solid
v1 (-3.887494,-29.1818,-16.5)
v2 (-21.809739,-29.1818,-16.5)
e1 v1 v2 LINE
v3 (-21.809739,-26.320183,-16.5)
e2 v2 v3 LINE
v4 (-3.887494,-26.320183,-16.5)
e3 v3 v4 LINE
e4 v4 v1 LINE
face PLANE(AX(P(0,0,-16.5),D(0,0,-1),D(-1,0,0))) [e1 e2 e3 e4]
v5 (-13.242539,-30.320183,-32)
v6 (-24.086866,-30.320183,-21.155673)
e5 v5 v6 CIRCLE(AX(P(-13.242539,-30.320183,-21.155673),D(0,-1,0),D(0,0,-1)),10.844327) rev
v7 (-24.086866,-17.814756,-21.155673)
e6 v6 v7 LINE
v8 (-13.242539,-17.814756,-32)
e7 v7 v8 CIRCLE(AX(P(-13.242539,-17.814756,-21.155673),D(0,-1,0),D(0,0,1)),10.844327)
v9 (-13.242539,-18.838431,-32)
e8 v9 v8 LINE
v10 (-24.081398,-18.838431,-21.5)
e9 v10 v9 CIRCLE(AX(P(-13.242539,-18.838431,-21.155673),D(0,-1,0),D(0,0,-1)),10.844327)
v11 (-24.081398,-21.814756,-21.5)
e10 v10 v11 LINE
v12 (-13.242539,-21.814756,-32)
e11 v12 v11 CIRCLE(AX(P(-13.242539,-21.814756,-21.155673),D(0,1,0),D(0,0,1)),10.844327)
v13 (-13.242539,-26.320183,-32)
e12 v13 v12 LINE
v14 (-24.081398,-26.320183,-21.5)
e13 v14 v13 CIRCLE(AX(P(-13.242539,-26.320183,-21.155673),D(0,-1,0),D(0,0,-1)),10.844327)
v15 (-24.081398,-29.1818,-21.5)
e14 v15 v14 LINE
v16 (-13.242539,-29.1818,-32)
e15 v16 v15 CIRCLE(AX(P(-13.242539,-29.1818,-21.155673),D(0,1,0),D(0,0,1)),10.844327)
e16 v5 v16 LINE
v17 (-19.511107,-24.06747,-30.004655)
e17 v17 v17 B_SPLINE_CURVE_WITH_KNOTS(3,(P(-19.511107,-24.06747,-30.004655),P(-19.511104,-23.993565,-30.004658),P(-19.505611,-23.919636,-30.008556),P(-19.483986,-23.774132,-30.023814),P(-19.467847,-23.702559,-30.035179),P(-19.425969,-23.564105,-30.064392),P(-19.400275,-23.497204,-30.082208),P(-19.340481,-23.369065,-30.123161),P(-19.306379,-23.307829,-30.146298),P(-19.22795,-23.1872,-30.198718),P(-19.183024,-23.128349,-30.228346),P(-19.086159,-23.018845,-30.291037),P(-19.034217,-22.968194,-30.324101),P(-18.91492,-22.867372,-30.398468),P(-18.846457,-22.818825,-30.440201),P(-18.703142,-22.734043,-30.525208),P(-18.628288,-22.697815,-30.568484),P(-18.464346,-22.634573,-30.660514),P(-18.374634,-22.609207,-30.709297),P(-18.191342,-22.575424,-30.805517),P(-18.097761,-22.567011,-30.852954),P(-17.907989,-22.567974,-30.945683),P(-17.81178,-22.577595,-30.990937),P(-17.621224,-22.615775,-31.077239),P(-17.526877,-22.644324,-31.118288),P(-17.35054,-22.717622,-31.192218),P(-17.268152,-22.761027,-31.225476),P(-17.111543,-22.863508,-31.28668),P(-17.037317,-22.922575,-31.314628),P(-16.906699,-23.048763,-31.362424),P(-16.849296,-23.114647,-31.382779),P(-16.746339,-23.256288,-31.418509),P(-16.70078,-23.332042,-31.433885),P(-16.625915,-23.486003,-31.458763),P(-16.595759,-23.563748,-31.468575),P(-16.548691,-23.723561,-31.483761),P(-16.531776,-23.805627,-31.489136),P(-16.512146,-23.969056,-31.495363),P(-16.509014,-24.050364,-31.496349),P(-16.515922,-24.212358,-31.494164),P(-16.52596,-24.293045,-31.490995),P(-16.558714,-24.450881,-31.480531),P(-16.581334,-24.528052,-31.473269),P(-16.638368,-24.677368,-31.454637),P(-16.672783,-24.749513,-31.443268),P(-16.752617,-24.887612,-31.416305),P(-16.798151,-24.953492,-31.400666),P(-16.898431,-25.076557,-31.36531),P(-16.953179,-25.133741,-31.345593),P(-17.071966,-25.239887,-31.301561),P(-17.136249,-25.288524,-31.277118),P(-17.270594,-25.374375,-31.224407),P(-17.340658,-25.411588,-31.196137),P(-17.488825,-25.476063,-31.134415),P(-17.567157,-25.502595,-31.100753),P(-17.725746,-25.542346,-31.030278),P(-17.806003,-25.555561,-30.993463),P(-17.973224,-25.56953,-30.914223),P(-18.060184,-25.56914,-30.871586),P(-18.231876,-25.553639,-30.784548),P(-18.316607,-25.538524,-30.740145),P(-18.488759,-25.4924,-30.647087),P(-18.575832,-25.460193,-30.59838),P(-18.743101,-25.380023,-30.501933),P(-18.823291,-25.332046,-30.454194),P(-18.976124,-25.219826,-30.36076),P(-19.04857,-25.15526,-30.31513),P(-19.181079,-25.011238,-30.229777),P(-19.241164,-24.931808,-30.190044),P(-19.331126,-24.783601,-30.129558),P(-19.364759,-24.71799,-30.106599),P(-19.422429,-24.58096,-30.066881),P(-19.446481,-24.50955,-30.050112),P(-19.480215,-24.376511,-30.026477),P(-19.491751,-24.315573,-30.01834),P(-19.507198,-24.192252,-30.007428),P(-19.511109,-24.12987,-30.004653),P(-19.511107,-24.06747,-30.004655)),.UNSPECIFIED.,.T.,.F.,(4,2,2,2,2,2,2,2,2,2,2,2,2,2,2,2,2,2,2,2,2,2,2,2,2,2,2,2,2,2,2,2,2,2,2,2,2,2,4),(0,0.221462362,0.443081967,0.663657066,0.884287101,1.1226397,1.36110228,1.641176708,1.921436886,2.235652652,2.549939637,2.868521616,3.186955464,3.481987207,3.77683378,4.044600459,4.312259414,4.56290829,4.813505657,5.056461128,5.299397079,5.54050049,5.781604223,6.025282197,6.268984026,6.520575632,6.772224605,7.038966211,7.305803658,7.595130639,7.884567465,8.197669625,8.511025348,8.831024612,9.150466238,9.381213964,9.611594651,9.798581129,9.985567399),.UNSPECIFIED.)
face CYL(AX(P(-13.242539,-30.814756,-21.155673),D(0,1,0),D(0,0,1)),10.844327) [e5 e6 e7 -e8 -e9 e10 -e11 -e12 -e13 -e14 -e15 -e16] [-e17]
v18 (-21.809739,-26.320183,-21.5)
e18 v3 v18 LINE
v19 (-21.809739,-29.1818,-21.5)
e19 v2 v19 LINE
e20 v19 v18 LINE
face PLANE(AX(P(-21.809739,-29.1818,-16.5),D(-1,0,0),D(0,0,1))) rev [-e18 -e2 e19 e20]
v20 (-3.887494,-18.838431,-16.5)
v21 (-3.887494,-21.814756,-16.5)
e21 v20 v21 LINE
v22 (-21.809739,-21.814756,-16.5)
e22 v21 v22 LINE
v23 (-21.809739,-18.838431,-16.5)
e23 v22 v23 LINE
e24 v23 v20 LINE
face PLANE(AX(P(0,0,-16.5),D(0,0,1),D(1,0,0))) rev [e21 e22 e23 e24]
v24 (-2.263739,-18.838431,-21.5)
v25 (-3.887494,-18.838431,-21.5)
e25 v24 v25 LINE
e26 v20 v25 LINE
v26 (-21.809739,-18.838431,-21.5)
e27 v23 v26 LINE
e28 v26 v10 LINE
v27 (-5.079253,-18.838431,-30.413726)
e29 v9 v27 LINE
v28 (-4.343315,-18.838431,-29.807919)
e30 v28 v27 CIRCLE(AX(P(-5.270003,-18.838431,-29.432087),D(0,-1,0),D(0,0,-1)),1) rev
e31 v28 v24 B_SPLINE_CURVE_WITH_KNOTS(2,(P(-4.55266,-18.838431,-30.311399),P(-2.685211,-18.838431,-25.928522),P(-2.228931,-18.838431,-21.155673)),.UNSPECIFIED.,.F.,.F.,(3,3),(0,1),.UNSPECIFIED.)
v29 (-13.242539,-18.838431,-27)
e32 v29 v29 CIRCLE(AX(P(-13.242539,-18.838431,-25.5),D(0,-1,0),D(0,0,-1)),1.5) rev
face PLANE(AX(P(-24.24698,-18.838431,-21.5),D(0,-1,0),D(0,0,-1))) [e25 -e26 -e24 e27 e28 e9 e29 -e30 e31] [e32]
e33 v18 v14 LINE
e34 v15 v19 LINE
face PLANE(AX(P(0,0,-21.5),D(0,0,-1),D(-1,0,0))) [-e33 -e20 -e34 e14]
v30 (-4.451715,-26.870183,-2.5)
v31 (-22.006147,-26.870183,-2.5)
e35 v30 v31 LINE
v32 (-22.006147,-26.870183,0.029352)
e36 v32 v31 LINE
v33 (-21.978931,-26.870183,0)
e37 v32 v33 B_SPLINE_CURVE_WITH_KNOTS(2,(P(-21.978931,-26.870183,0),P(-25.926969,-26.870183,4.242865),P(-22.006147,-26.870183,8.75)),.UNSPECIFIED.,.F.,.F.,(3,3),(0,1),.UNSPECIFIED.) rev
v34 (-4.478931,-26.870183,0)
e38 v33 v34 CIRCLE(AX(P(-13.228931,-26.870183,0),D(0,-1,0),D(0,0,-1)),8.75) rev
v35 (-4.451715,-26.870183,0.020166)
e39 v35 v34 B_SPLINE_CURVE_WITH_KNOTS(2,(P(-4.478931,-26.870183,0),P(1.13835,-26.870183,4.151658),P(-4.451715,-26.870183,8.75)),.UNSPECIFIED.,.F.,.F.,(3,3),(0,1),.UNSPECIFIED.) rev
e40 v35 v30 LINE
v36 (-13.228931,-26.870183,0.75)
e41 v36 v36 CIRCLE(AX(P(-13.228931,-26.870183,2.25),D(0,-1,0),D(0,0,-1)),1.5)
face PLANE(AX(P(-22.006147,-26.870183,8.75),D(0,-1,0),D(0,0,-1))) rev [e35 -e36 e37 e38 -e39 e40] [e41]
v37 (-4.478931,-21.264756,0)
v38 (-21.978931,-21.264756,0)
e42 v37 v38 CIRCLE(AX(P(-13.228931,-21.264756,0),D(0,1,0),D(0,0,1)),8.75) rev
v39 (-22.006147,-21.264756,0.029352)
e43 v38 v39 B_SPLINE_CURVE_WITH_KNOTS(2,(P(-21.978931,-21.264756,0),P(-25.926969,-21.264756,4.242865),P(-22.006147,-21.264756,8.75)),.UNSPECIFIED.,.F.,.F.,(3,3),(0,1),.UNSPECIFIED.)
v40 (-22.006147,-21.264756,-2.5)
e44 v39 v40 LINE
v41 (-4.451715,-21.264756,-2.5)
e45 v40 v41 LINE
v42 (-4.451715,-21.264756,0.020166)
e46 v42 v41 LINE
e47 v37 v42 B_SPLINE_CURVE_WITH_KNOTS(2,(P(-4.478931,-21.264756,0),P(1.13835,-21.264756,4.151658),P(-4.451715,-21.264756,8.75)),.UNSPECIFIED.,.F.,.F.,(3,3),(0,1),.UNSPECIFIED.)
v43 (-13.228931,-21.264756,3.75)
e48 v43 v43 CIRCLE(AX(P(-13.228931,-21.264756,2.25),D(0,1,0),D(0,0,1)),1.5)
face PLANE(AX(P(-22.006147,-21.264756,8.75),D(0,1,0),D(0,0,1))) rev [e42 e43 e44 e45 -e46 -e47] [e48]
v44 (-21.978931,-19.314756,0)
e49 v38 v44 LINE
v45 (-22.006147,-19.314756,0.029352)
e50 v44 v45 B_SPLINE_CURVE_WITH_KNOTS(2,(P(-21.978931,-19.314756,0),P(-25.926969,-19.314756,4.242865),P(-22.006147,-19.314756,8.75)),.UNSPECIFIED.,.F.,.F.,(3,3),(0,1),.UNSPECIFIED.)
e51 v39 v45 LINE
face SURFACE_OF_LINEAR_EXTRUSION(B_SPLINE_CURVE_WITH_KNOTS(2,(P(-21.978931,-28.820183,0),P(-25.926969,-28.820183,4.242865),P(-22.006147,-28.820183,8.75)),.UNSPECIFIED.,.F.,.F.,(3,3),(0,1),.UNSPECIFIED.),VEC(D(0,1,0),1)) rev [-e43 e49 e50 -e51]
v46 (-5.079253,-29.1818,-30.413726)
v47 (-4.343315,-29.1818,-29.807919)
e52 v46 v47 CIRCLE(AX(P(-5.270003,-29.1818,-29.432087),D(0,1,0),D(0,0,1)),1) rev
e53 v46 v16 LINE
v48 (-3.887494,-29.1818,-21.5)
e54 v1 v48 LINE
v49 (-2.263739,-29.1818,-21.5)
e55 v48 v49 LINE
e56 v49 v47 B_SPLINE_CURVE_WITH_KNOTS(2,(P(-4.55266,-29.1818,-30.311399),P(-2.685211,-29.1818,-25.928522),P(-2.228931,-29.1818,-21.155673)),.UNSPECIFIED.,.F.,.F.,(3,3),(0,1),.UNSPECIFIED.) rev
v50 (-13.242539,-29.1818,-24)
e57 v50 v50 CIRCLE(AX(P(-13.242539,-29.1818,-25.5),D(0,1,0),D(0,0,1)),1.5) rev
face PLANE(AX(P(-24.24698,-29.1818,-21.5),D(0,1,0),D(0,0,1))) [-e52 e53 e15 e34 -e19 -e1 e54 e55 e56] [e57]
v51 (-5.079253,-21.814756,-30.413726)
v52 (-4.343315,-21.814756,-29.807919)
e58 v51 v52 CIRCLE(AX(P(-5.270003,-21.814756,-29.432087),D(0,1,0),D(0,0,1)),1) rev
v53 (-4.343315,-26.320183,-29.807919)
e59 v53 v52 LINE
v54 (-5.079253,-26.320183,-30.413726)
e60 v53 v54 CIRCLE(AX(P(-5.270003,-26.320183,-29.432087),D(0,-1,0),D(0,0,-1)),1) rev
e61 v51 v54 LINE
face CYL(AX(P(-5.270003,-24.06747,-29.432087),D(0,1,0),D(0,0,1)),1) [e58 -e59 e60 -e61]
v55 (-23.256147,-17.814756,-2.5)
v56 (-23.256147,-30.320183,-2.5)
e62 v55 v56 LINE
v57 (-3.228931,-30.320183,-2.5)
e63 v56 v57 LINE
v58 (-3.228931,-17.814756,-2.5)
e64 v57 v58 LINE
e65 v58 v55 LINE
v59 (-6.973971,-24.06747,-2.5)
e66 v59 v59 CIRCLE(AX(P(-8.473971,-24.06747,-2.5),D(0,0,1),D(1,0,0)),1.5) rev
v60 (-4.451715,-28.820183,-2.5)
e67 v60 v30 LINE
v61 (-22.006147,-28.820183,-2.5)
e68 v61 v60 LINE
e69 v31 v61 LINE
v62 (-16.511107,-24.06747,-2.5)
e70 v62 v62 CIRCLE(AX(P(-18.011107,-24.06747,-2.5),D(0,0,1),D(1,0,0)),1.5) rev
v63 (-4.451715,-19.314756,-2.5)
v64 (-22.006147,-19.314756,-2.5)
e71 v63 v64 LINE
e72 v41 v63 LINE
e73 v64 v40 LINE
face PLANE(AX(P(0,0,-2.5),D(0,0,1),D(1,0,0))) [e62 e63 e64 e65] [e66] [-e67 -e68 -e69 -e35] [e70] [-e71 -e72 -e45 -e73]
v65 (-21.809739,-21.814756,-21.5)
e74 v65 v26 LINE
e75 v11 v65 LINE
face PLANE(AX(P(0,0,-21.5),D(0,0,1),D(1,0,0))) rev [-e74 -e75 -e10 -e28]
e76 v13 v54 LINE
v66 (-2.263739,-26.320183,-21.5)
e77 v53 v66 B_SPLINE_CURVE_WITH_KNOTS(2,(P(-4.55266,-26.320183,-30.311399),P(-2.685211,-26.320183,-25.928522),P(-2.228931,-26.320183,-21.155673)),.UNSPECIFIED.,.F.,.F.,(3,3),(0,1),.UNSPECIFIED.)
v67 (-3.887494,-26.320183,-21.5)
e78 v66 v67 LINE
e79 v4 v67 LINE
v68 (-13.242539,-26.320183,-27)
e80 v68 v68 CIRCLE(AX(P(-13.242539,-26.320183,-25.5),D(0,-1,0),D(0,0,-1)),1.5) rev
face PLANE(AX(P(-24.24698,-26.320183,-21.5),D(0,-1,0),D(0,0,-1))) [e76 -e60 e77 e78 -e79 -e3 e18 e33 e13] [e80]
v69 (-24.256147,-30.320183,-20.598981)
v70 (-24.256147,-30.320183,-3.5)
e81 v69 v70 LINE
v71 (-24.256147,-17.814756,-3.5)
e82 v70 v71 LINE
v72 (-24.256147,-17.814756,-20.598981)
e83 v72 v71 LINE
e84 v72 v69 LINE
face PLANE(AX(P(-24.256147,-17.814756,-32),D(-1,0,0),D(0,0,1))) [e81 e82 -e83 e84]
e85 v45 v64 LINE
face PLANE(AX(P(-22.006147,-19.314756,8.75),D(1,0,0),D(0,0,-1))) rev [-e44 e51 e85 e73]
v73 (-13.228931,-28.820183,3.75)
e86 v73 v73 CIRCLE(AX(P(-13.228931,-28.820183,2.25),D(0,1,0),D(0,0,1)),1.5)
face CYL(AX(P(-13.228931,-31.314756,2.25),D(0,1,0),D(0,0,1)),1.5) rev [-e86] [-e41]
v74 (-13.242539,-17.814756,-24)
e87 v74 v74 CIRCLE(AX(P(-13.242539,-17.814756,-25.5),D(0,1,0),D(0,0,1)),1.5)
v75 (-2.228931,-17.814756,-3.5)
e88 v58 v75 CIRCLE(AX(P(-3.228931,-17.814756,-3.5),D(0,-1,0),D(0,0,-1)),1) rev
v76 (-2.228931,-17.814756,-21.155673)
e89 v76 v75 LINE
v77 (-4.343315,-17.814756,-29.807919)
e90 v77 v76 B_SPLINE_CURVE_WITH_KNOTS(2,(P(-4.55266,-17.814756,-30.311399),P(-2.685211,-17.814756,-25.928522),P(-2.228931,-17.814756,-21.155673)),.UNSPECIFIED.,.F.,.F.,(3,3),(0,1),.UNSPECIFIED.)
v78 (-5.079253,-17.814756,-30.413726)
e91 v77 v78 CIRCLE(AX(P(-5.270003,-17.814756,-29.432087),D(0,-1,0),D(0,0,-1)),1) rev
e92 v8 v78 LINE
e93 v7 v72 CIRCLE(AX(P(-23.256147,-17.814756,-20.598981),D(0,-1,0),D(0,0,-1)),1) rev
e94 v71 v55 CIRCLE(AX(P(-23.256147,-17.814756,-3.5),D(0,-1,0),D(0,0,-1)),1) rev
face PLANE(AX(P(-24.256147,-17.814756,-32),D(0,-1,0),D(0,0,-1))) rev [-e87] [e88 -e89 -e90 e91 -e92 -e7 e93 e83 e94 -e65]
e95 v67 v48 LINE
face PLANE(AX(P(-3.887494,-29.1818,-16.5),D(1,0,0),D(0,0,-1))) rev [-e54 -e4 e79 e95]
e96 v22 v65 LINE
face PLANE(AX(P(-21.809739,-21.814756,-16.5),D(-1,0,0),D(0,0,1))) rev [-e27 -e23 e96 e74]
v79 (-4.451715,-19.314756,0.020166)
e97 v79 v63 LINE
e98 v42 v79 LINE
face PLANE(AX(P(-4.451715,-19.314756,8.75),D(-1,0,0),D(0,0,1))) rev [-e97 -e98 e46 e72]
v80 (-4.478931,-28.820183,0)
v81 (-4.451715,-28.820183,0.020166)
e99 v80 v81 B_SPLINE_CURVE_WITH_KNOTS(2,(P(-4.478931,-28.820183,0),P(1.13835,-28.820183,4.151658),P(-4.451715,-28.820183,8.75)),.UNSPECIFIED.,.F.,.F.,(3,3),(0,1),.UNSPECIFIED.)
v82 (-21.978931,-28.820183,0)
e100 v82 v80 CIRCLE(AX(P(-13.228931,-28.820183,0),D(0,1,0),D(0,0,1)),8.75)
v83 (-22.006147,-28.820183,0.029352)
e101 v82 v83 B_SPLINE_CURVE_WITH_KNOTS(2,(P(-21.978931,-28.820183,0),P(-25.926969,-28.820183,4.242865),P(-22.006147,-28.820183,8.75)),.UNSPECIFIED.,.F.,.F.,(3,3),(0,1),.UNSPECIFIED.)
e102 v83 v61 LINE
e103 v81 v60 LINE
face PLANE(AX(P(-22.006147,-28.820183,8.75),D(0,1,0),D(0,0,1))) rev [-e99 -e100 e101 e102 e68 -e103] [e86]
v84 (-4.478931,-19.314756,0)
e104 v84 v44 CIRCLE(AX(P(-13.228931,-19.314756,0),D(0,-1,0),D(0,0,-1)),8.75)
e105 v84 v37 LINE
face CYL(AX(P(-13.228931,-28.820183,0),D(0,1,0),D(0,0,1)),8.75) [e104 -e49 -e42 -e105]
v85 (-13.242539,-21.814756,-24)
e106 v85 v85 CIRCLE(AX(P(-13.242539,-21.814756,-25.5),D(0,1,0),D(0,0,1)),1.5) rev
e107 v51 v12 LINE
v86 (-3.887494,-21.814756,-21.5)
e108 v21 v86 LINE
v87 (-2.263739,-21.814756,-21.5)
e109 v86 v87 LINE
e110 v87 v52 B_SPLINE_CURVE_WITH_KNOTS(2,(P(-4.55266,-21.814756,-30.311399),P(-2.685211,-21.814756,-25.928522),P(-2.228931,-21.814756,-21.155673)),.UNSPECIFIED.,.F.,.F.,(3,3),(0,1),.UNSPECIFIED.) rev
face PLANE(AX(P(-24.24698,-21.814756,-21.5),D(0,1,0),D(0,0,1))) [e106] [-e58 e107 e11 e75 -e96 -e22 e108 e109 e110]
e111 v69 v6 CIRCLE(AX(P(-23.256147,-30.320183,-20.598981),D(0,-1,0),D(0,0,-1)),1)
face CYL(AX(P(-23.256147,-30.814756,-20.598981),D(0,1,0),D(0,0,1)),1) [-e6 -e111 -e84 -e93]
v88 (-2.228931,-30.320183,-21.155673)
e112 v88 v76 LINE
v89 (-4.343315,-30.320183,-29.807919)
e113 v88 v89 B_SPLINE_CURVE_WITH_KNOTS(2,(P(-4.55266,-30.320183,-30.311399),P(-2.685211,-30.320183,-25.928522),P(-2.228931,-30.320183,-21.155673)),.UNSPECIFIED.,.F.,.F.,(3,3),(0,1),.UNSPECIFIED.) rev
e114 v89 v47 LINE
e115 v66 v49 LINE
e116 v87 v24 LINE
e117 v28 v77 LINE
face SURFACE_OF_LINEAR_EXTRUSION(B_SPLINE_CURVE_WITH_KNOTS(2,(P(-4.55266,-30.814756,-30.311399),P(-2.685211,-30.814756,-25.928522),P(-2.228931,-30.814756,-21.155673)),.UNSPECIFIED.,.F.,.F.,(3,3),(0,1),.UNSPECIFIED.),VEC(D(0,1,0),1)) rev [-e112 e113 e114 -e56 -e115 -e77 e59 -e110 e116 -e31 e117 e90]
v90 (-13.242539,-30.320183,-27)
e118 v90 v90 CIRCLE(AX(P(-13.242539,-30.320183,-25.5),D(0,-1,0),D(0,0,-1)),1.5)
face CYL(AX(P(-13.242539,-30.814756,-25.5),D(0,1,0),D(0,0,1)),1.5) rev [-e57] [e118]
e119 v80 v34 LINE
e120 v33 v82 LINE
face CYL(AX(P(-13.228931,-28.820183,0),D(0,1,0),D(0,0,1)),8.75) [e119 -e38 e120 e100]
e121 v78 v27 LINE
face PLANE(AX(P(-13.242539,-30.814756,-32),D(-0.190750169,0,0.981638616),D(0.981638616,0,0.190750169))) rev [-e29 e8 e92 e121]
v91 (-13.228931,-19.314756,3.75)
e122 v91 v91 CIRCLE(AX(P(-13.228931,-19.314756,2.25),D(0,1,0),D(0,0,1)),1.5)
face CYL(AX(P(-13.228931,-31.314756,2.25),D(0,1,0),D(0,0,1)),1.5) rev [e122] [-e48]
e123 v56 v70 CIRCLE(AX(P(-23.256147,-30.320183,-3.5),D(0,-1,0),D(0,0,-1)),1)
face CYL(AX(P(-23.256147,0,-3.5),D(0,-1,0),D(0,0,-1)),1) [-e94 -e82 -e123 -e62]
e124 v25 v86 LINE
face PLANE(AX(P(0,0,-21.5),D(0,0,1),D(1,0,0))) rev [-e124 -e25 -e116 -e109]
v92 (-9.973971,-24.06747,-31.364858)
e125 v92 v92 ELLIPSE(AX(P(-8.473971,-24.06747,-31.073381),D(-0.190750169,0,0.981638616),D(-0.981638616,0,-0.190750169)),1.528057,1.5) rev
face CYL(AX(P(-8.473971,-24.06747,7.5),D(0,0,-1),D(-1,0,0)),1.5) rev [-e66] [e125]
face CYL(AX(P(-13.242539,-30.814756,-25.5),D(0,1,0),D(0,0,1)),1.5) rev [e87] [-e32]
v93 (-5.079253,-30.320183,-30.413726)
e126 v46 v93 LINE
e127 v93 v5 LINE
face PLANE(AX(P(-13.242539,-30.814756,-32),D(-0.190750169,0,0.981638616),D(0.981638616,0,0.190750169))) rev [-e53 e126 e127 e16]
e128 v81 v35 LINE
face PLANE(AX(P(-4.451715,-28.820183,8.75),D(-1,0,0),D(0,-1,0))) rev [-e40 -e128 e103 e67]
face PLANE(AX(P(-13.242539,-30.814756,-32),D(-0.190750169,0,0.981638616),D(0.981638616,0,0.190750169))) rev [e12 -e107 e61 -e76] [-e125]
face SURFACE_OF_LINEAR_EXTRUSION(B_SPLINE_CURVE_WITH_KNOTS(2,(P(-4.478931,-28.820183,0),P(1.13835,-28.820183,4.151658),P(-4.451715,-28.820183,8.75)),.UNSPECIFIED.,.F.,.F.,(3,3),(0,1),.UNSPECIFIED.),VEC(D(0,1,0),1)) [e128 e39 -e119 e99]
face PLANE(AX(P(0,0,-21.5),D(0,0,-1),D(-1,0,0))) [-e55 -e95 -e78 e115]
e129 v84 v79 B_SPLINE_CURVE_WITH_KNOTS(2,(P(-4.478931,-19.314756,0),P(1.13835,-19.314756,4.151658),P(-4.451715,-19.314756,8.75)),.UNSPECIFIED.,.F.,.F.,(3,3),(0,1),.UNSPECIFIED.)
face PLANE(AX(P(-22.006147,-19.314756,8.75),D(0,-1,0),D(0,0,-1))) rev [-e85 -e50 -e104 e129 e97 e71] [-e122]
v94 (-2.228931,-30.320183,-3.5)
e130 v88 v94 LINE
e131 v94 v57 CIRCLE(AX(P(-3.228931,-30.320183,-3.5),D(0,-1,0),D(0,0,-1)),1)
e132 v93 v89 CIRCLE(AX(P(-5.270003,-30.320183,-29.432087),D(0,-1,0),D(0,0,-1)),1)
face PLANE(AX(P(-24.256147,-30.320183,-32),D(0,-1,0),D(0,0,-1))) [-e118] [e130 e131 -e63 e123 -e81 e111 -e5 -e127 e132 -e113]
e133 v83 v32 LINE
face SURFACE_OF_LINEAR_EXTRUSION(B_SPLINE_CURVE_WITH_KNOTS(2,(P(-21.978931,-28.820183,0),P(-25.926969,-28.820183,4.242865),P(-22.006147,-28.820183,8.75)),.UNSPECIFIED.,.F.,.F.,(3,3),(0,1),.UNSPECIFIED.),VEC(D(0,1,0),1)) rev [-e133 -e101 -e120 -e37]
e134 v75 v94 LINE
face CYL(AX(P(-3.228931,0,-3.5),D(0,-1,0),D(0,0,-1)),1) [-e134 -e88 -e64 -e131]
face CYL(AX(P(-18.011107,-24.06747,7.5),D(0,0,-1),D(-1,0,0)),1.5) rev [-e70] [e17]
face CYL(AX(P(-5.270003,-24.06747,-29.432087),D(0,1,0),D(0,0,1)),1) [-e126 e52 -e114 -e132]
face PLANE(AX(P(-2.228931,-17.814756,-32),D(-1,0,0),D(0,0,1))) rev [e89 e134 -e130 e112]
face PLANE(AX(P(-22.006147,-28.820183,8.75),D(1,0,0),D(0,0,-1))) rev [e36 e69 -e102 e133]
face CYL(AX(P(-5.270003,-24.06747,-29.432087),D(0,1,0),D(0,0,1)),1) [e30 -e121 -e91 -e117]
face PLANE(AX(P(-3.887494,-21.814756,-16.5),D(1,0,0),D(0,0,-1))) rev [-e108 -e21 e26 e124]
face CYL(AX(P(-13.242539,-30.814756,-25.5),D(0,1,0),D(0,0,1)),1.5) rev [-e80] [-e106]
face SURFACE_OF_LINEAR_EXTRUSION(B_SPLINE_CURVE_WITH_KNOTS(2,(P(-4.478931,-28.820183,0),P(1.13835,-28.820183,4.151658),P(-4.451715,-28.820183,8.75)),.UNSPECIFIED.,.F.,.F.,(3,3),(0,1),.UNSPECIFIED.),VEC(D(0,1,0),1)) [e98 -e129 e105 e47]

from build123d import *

# Parameters (mm, degrees)
SKETCH2_W               = 17.554431489
SKETCH2_H               = 1.95
BOSS_EXTRUDE1_DEPTH     = 8.75
BOSS_EXTRUDE1_2_DEPTH   = 8.75
CUT_EXTRUDE1_DEPTH      = 26.518349076
SKETCH4_W               = 22.027215745
SKETCH4_H               = 12.505427167
BOSS_EXTRUDE2_DEPTH     = 32
SKETCH5_R               = 1.5
CUT_EXTRUDE2_DEPTH      = 12
SKETCH6_W               = 22.027215745
SKETCH6_H               = 12.505427167
SKETCH6_W_2             = 17.554431489
SKETCH6_H_2             = 1.95
CUT_EXTRUDE3_DEPTH      = 2.5
SKETCH7_R               = 1.5
CUT_EXTRUDE4_DEPTH      = 13
CUT_EXTRUDE5_DEPTH      = 10
CUT_EXTRUDE5_DEPTH_BACK = 32
SKETCH8_R               = 1.5
FILLET3_R               = 1
SKETCH9_W               = 22.034876082
SKETCH9_H               = 2.976325088
SKETCH9_H_2             = 2.861616895
CUT_EXTRUDE6_DEPTH      = 11
SKETCH10_W              = 17.922244656
SKETCH10_H              = 2.976325088
SKETCH10_H_2            = 2.861616895
CUT_EXTRUDE7_DEPTH      = 5


with BuildPart() as part:
    # Sketch2 → Boss-Extrude1 (new body)
    with BuildSketch(Plane.XY):
        with Locations((-13.228930986, -27.845183414)):
            Rectangle(SKETCH2_W, SKETCH2_H)
    extrude(amount=BOSS_EXTRUDE1_DEPTH)


with BuildPart() as body_2:
    # Sketch2 → Boss-Extrude1 2 (new body)
    with BuildSketch(Plane.XY):
        with Locations((-13.228930986, -20.289756247)):
            Rectangle(SKETCH2_W, SKETCH2_H)
    extrude(amount=BOSS_EXTRUDE1_2_DEPTH)


with BuildPart() as cut_extrude1_tool:
    # Sketch3 → Cut-Extrude1 (new, through all)
    with BuildSketch(Plane(origin=(0, -19.314756247, 0), x_dir=(1, 0, 0), z_dir=(0, 1, 0))):
        with BuildLine():
            ThreePointArc((-13.228930986, -8.75), (-7.041746651, -6.187184335), (-4.478930986, 0))
            add(Edge.make_bspline(
                [(-4.478930986, 0), (1.138349918, -4.151657709), (-4.451715242, -8.75)],
                knots=[0, 0, 0, 1, 1, 1], degree=2))
            add(Edge.make_bspline(
                [(-22.006146731, -8.75), (-13.228930986, -12.473510392), (-4.451715242, -8.75)],
                knots=[0, 0, 0, 1, 1, 1], degree=2))
            add(Edge.make_bspline(
                [(-21.978930986, 0), (-25.926969228, -4.242865138), (-22.006146731, -8.75)],
                knots=[0, 0, 0, 1, 1, 1], degree=2))
            ThreePointArc((-21.978930986, 0), (-19.416115322, -6.187184335), (-13.228930986, -8.75))
        make_face()
    extrude(amount=-CUT_EXTRUDE1_DEPTH)


with BuildPart() as part_1:
    add(part.part)

    # Cut-Extrude1: cut by cut_extrude1_tool
    add(cut_extrude1_tool.part, mode=Mode.SUBTRACT)



with BuildPart() as body_2_1:
    add(body_2.part)

    # Cut-Extrude1: cut by cut_extrude1_tool
    add(cut_extrude1_tool.part, mode=Mode.SUBTRACT)


with BuildPart() as part_2:
    add(part_1.part)

    add(body_2_1.part)  # Boss-Extrude2 merges body 2
    # Sketch4 → Boss-Extrude2 (add)
    with BuildSketch(Plane(origin=(0, 0, 0), x_dir=(-1, 0, 0), z_dir=(0, 0, -1))):
        with Locations((13.242538859, -24.067469831)):
            Rectangle(SKETCH4_W, SKETCH4_H)
    extrude(amount=BOSS_EXTRUDE2_DEPTH)

    # Sketch5 → Cut-Extrude2 (cut)
    with BuildSketch(Plane(origin=(0, -19.314756247, 0), x_dir=(1, 0, 0), z_dir=(0, 1, 0))):
        with Locations(Location((-13.228930986, -2.25, 0), (0, 0, 270))):
            Circle(SKETCH5_R)
    extrude(amount=-CUT_EXTRUDE2_DEPTH, mode=Mode.SUBTRACT)

    # Sketch6 → Cut-Extrude3 (cut)
    with BuildSketch(Plane.XY):
        with Locations((-13.242538859, -24.067469831)):
            Rectangle(SKETCH6_W, SKETCH6_H)
        with Locations((-13.228930986, -27.845183414)):
            Rectangle(SKETCH6_W_2, SKETCH6_H_2, mode=Mode.SUBTRACT)
        with Locations((-13.228930986, -20.289756247)):
            Rectangle(SKETCH6_W_2, SKETCH6_H_2, mode=Mode.SUBTRACT)
    extrude(amount=-CUT_EXTRUDE3_DEPTH, mode=Mode.SUBTRACT)

    # Sketch7 → Cut-Extrude4 (cut)
    with BuildSketch(Plane(origin=(0, -17.814756247, 0), x_dir=(1, 0, 0), z_dir=(0, 1, 0))):
        with Locations(Location((-13.242538859, 25.5, 0), (0, 0, 270))):
            Circle(SKETCH7_R)
        with BuildLine():
            Line((-24.086865874, 21.155672985), (-24.256146731, 21.155672985))
            add(Edge.make_bspline(
                [(-2.228930986, 21.155672985), (11.471530889, 27.189710441), (-11.765166974, 53.431279988), (-37.007876173, 21.523583672), (-24.256146731, 21.155672985)],
                knots=[0, 0, 0, 0, 0.52011282, 1, 1, 1, 1], degree=3))
            add(Edge.make_bspline(
                [(-4.552660132, 30.311399113), (-2.685211009, 25.928521854), (-2.228930986, 21.155672985)],
                knots=[0, 0, 0, 1, 1, 1], degree=2))
            Line((-4.552660132, 30.311399113), (-13.242538859, 32))
            ThreePointArc((-13.242538859, 32), (-20.910636028, 28.823770155), (-24.086865874, 21.155672985))
        make_face()
    extrude(amount=-CUT_EXTRUDE4_DEPTH, mode=Mode.SUBTRACT)

    # Sketch8 → Cut-Extrude5 (cut, two sides: drawn at the far end of the back side and taken through both)
    with BuildSketch(Plane.XY.offset(-2.5).offset(-CUT_EXTRUDE5_DEPTH_BACK)):
        with Locations(Location((-18.011106811, -24.06746983, 0), (0, 0, 180))):
            Circle(SKETCH8_R)
        with Locations(Location((-8.473970906, -24.06746983, 0), (0, 0, 180))):
            Circle(SKETCH8_R)
    extrude(amount=CUT_EXTRUDE5_DEPTH + CUT_EXTRUDE5_DEPTH_BACK, mode=Mode.SUBTRACT)

    # Fillet3
    # the kernel refuses this fillet: 1 mm, written as the material it takes off along each edge
    with BuildSketch(Plane(origin=(-24.256146731, -15.314756247, -2.5), x_dir=(0, 0, -1), z_dir=(0, -1, 0)), Plane(origin=(-2.228930986, -32.820183414, -2.5), x_dir=(0, 0, -1), z_dir=(0, 1, 0))) as fillet3_piece_1:
        with BuildLine():
            CenterArc((FILLET3_R, FILLET3_R), FILLET3_R, 180, 90)
            Line((0, FILLET3_R), (-FILLET3_R * 0.02, FILLET3_R))
            Line((-FILLET3_R * 0.02, FILLET3_R), (-FILLET3_R * 0.02, -FILLET3_R * 0.02))
            Line((-FILLET3_R * 0.02, -FILLET3_R * 0.02), (FILLET3_R, -FILLET3_R * 0.02))
            Line((FILLET3_R, -FILLET3_R * 0.02), (FILLET3_R, 0))
        make_face()
    extrude(amount=17.505427167, mode=Mode.SUBTRACT)
    with BuildSketch(Plane(origin=(-24.256146731, -16.423026869, -21.155672985), x_dir=(1.0, 0, 2.5394386720559264e-12), z_dir=(0, -1, 0))) as fillet3_piece_2:
        with BuildLine():
            CenterArc((1, 0.556691751), FILLET3_R, 180, 33.827317624)
            Line((0, 0.556691751), (-0.02, 0.556691751))
            Line((-0.02, 0.556691751), (-0.02, 0))
            Line((-0.02, 0), (0, -0.02))
            ThreePointArc((0, -0.02), (0.084640429, -0.02), (0.152666474, -0.011133835))
            Line((0.152666474, -0.011133835), (0.169280857, 0))
        make_face()
    extrude(amount=15.288885922, mode=Mode.SUBTRACT)
    with BuildSketch(Plane(origin=(-4.552660132, -16.451585564, -30.311399113), x_dir=(0.3839298520349852, 0, 0.9233622629912891), z_dir=(0, -1, 0))) as fillet3_piece_3:
        with BuildLine():
            CenterArc((0.536514164, 0.999961682), FILLET3_R, 213.573886674, 56.927693277)
            Line((-0.296659206, 0.446949805), (-0.313322674, 0.435889568))
            Line((-0.313322674, 0.435889568), (-0.016663467, -0.011060238))
            Line((-0.016663467, -0.011060238), (-0.0001747, -0.019999237))
            ThreePointArc((-0.0001747, -0.019999237), (0.272634035, -0.021192075), (0.545443356, -0.019999234))
            Line((0.545443356, -0.019999234), (0.545268273, 0))
        make_face()
    extrude(amount=15.231768533, mode=Mode.SUBTRACT)

    # Sketch9 → Cut-Extrude6 (cut)
    with BuildSketch(Plane.XY.offset(-32.5)):
        with Locations((-13.229542087, -20.326593706)):
            Rectangle(SKETCH9_W, SKETCH9_H)
        with Locations((-13.229542087, -27.750991873)):
            Rectangle(SKETCH9_W, SKETCH9_H_2)
    extrude(amount=CUT_EXTRUDE6_DEPTH, mode=Mode.SUBTRACT)

    # Sketch10 → Cut-Extrude7 (cut)
    with BuildSketch(Plane(origin=(0, 0, -21.5), x_dir=(-1, 0, 0), z_dir=(0, 0, -1))):
        with Locations((12.848616278, -20.326593706)):
            Rectangle(SKETCH10_W, SKETCH10_H)
        with Locations((12.848616278, -27.750991873)):
            Rectangle(SKETCH10_W, SKETCH10_H_2)
    extrude(amount=-CUT_EXTRUDE7_DEPTH, mode=Mode.SUBTRACT)


solid = part_2.part
